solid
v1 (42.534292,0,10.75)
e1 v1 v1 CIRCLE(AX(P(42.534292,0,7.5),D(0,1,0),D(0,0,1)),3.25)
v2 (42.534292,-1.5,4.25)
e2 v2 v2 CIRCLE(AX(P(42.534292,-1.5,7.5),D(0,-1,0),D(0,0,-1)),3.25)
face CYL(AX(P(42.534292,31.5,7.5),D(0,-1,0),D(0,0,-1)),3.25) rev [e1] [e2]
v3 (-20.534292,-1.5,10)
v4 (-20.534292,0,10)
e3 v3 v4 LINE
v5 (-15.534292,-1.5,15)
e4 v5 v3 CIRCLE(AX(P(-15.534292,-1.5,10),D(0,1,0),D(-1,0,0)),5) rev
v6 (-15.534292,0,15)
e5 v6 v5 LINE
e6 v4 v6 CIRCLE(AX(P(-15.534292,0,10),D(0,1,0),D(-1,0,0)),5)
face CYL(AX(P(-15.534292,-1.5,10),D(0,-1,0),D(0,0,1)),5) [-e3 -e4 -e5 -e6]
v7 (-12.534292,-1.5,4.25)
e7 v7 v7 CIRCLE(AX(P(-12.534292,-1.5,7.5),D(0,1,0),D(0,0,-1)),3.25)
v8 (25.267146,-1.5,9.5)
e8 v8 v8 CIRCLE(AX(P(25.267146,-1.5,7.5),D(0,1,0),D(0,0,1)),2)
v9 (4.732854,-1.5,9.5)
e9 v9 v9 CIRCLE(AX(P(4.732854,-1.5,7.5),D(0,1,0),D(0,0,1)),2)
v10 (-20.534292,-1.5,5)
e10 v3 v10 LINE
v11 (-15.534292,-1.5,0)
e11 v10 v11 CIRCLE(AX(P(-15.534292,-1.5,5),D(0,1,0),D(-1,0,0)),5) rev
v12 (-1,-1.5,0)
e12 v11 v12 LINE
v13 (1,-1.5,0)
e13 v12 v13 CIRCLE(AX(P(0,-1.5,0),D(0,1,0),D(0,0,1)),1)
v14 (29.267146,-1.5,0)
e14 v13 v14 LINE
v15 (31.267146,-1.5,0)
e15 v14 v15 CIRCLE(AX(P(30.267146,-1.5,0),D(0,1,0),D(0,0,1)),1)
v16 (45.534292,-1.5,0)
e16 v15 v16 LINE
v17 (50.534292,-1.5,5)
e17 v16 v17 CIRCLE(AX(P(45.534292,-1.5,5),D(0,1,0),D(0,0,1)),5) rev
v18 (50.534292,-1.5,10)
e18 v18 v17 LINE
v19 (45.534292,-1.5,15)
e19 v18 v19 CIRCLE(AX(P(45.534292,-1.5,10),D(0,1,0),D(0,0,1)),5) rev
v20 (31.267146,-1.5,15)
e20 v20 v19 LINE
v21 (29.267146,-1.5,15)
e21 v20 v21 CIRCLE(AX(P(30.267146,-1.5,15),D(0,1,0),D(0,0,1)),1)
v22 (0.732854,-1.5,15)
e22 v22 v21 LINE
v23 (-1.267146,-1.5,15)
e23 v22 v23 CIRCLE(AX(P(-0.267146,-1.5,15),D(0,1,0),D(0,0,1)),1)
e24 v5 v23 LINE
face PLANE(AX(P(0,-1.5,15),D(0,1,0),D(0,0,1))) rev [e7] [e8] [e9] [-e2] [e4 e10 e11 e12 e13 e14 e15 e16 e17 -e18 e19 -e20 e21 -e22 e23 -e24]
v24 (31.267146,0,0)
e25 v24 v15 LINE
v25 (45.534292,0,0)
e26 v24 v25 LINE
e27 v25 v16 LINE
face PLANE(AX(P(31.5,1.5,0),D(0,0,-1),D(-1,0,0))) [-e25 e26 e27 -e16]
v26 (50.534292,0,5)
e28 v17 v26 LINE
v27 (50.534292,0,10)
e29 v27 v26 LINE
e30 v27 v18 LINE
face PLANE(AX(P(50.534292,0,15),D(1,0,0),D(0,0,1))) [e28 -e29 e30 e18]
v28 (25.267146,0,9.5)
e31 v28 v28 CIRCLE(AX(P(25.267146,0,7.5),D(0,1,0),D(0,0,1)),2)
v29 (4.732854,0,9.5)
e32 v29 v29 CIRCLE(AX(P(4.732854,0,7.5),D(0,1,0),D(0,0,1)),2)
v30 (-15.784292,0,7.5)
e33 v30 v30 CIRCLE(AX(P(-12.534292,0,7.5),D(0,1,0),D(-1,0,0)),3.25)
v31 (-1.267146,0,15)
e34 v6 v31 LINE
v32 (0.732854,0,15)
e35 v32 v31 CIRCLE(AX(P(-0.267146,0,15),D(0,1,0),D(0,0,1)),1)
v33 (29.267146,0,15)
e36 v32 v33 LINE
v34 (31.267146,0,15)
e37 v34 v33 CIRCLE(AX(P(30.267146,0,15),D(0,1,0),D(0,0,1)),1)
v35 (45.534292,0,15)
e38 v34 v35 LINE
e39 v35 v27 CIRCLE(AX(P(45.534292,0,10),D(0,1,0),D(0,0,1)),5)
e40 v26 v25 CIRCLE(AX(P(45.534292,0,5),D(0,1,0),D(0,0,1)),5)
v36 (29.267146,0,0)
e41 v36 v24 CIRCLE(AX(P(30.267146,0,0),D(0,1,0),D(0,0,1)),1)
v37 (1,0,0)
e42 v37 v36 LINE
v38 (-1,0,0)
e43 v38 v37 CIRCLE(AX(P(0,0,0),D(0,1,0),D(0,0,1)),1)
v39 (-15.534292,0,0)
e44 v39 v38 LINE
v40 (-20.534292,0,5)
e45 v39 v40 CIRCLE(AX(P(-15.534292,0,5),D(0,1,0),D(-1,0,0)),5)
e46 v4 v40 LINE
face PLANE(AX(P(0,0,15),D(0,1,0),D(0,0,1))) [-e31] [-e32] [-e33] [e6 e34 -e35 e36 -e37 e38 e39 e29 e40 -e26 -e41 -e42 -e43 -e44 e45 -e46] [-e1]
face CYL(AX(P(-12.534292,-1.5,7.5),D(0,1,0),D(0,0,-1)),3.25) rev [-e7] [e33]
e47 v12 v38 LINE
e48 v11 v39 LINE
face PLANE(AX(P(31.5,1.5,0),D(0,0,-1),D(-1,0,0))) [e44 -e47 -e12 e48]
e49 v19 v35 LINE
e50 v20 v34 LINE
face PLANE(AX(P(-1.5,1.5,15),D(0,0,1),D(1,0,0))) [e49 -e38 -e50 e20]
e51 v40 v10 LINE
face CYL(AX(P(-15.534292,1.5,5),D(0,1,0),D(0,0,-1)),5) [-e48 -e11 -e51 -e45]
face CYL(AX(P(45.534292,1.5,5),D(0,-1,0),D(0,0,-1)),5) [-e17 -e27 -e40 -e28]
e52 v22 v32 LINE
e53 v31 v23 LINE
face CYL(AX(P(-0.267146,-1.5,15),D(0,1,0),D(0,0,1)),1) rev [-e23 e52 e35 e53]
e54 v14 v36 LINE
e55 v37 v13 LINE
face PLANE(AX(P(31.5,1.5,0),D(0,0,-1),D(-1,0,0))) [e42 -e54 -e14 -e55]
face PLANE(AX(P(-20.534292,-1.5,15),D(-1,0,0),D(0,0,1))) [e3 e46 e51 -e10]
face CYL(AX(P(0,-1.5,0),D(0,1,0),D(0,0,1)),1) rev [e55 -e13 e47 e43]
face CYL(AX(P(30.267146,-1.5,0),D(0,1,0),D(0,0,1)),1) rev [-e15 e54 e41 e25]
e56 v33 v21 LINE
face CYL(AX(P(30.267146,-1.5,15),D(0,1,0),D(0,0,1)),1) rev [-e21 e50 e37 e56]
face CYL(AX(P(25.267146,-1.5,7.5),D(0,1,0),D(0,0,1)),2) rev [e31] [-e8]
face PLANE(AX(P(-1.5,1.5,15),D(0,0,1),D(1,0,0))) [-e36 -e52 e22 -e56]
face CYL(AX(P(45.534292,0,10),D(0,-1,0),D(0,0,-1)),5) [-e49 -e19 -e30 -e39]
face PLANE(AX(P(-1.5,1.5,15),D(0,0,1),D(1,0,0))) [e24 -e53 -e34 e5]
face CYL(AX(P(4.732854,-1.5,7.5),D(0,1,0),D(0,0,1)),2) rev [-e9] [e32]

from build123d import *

# Parameters (mm, degrees)
SM_BASE_FLANGE_2_DEPTH      = 15
SKETCH_26_R                 = 3.25
CUT_EXTRUDE_1_DEPTH         = 42.400483089
FILLET_1_R                  = 5
CUT_EXTRUDE_2_OUTLINE_W     = 33
CUT_EXTRUDE_2_OUTLINE_H     = 15
CUT_EXTRUDE_2_OUTLINE_R     = 2
CUT_EXTRUDE_2_DEPTH         = 20
CUT_EXTRUDE_START           = -1.5
CUT_EXTRUDE_2_2_OUTLINE_R   = 2
CUT_EXTRUDE_2_2_DEPTH       = 1.5
CUT_EXTRUDE_2_3_OUTLINE_R   = 2
CUT_EXTRUDE_2_3_OUTLINE_R_2 = 3.25
CUT_EXTRUDE_2_3_DEPTH       = 1.5


# Read off the part's stored shape, not the designer's step: Вырез-Вытянуть2
# Sheet-metal steps are written as plain solids
with BuildPart() as part:
    # Эскиз1 → Базовая кромка2 (new body)
    with BuildSketch(Plane.XY):
        with BuildLine():
            Line((0, 20), (0, 1.5))
            ThreePointArc((0, 1.5), (0.439339828, 0.439339828), (1.5, 0))
            Line((1.5, 0), (28.5, 0))
            ThreePointArc((28.5, 0), (29.560660172, 0.439339828), (30, 1.5))
            Line((30, 1.5), (30, 20))
            Line((30, 20), (31.5, 20))
            Line((31.5, 20), (31.5, 1.5))
            ThreePointArc((31.5, 1.5), (30.621320344, -0.621320344), (28.5, -1.5))
            Line((28.5, -1.5), (1.5, -1.5))
            ThreePointArc((1.5, -1.5), (-0.621320344, -0.621320344), (-1.5, 1.5))
            Line((-1.5, 1.5), (-1.5, 20))
            Line((-1.5, 20), (0, 20))
        make_face()
    extrude(amount=SM_BASE_FLANGE_2_DEPTH)

    # Эскиз26 → Вырез-Вытянуть1 (cut, through all)
    with BuildSketch(Plane(origin=(31.5, 0, 0), x_dir=(0, 0, -1), z_dir=(1, 0, 0))):
        with Locations((-7.5, 12)):
            Circle(SKETCH_26_R)
    extrude(amount=-CUT_EXTRUDE_1_DEPTH, mode=Mode.SUBTRACT)

    # Скругление1
    fillet_1_edges = [part.edges().sort_by_distance(p)[0] for p in [
        (-0.75, 20, 0),
        (30.75, 20, 0),
        (-0.75, 20, 15),
        (30.75, 20, 15),
    ]]
    fillet(fillet_1_edges, radius=FILLET_1_R)

    # Вырез-Вытянуть2 outline → Вырез-Вытянуть2 (cut)
    with BuildSketch(Plane(origin=(0, 0, 0), x_dir=(1, 0, 0), z_dir=(0, 1, 0))):
        with Locations((15, -7.5)):
            Rectangle(CUT_EXTRUDE_2_OUTLINE_W, CUT_EXTRUDE_2_OUTLINE_H)
        with Locations((25.267145868, -7.5)):
            Circle(CUT_EXTRUDE_2_OUTLINE_R, mode=Mode.SUBTRACT)
        with Locations((4.732854132, -7.5)):
            Circle(CUT_EXTRUDE_2_OUTLINE_R, mode=Mode.SUBTRACT)
    extrude(amount=CUT_EXTRUDE_2_DEPTH, mode=Mode.SUBTRACT)

    # Cut-Extrude 2 2 outline → Cut-Extrude 2 2 (cut)
    with BuildSketch(Plane(origin=(0, 0, 0), x_dir=(1, 0, 0), z_dir=(0, 1, 0)).offset(CUT_EXTRUDE_START)):
        with BuildLine():
            ThreePointArc((31.267145868, -15), (30.267145868, -14), (29.267145868, -15))
            Line((29.267145868, -15), (31.267145868, -15))
        make_face()
        with BuildLine():
            Line((31.267145868, 0), (29.267145868, 0))
            ThreePointArc((29.267145868, 0), (30.267145868, -1), (31.267145868, 0))
        make_face()
        with BuildLine():
            ThreePointArc((0.732854132, -15), (-0.267145868, -14), (-1.267145868, -15))
            Line((-1.267145868, -15), (0.732854132, -15))
        make_face()
        with BuildLine():
            Line((1, 0), (-1, 0))
            ThreePointArc((-1, 0), (0, -1), (1, 0))
        make_face()
        with Locations((25.267145868, -7.5)):
            Circle(CUT_EXTRUDE_2_2_OUTLINE_R)
        with Locations((4.732854132, -7.5)):
            Circle(CUT_EXTRUDE_2_2_OUTLINE_R)
    extrude(amount=CUT_EXTRUDE_2_2_DEPTH, mode=Mode.SUBTRACT)

    # Cut-Extrude 2 3 outline → Cut-Extrude 2 3 (add)
    with BuildSketch(Plane(origin=(0, 0, 0), x_dir=(1, 0, 0), z_dir=(0, 1, 0)).offset(CUT_EXTRUDE_START)):
        with BuildLine():
            Line((31.267145868, -15), (45.534291735, -15))
            ThreePointArc((45.534291735, -15), (49.069825641, -13.535533906), (50.534291735, -10))
            Line((50.534291735, -10), (50.534291735, -5))
            ThreePointArc((50.534291735, -5), (49.069825641, -1.464466094), (45.534291735, 0))
            Line((45.534291735, 0), (31.267145868, 0))
            ThreePointArc((31.267145868, 0), (30.267145868, -1), (29.267145868, 0))
            Line((29.267145868, 0), (1, 0))
            ThreePointArc((1, 0), (0, -1), (-1, 0))
            Line((-1, 0), (-15.534291735, 0))
            ThreePointArc((-15.534291735, 0), (-19.069825641, -1.464466094), (-20.534291735, -5))
            Line((-20.534291735, -5), (-20.534291735, -10))
            ThreePointArc((-20.534291735, -10), (-19.069825641, -13.535533906), (-15.534291735, -15))
            Line((-15.534291735, -15), (-1.267145868, -15))
            ThreePointArc((-1.267145868, -15), (-0.267145868, -14), (0.732854132, -15))
            Line((0.732854132, -15), (29.267145868, -15))
            ThreePointArc((29.267145868, -15), (30.267145868, -14), (31.267145868, -15))
        make_face()
        with Locations((25.267145868, -7.5)):
            Circle(CUT_EXTRUDE_2_3_OUTLINE_R, mode=Mode.SUBTRACT)
        with Locations((4.732854132, -7.5)):
            Circle(CUT_EXTRUDE_2_3_OUTLINE_R, mode=Mode.SUBTRACT)
        with Locations((42.534291735, -7.5)):
            Circle(CUT_EXTRUDE_2_3_OUTLINE_R_2, mode=Mode.SUBTRACT)
        with Locations((-12.534291735, -7.5)):
            Circle(CUT_EXTRUDE_2_3_OUTLINE_R_2, mode=Mode.SUBTRACT)
    extrude(amount=CUT_EXTRUDE_2_3_DEPTH)


solid = part.part
